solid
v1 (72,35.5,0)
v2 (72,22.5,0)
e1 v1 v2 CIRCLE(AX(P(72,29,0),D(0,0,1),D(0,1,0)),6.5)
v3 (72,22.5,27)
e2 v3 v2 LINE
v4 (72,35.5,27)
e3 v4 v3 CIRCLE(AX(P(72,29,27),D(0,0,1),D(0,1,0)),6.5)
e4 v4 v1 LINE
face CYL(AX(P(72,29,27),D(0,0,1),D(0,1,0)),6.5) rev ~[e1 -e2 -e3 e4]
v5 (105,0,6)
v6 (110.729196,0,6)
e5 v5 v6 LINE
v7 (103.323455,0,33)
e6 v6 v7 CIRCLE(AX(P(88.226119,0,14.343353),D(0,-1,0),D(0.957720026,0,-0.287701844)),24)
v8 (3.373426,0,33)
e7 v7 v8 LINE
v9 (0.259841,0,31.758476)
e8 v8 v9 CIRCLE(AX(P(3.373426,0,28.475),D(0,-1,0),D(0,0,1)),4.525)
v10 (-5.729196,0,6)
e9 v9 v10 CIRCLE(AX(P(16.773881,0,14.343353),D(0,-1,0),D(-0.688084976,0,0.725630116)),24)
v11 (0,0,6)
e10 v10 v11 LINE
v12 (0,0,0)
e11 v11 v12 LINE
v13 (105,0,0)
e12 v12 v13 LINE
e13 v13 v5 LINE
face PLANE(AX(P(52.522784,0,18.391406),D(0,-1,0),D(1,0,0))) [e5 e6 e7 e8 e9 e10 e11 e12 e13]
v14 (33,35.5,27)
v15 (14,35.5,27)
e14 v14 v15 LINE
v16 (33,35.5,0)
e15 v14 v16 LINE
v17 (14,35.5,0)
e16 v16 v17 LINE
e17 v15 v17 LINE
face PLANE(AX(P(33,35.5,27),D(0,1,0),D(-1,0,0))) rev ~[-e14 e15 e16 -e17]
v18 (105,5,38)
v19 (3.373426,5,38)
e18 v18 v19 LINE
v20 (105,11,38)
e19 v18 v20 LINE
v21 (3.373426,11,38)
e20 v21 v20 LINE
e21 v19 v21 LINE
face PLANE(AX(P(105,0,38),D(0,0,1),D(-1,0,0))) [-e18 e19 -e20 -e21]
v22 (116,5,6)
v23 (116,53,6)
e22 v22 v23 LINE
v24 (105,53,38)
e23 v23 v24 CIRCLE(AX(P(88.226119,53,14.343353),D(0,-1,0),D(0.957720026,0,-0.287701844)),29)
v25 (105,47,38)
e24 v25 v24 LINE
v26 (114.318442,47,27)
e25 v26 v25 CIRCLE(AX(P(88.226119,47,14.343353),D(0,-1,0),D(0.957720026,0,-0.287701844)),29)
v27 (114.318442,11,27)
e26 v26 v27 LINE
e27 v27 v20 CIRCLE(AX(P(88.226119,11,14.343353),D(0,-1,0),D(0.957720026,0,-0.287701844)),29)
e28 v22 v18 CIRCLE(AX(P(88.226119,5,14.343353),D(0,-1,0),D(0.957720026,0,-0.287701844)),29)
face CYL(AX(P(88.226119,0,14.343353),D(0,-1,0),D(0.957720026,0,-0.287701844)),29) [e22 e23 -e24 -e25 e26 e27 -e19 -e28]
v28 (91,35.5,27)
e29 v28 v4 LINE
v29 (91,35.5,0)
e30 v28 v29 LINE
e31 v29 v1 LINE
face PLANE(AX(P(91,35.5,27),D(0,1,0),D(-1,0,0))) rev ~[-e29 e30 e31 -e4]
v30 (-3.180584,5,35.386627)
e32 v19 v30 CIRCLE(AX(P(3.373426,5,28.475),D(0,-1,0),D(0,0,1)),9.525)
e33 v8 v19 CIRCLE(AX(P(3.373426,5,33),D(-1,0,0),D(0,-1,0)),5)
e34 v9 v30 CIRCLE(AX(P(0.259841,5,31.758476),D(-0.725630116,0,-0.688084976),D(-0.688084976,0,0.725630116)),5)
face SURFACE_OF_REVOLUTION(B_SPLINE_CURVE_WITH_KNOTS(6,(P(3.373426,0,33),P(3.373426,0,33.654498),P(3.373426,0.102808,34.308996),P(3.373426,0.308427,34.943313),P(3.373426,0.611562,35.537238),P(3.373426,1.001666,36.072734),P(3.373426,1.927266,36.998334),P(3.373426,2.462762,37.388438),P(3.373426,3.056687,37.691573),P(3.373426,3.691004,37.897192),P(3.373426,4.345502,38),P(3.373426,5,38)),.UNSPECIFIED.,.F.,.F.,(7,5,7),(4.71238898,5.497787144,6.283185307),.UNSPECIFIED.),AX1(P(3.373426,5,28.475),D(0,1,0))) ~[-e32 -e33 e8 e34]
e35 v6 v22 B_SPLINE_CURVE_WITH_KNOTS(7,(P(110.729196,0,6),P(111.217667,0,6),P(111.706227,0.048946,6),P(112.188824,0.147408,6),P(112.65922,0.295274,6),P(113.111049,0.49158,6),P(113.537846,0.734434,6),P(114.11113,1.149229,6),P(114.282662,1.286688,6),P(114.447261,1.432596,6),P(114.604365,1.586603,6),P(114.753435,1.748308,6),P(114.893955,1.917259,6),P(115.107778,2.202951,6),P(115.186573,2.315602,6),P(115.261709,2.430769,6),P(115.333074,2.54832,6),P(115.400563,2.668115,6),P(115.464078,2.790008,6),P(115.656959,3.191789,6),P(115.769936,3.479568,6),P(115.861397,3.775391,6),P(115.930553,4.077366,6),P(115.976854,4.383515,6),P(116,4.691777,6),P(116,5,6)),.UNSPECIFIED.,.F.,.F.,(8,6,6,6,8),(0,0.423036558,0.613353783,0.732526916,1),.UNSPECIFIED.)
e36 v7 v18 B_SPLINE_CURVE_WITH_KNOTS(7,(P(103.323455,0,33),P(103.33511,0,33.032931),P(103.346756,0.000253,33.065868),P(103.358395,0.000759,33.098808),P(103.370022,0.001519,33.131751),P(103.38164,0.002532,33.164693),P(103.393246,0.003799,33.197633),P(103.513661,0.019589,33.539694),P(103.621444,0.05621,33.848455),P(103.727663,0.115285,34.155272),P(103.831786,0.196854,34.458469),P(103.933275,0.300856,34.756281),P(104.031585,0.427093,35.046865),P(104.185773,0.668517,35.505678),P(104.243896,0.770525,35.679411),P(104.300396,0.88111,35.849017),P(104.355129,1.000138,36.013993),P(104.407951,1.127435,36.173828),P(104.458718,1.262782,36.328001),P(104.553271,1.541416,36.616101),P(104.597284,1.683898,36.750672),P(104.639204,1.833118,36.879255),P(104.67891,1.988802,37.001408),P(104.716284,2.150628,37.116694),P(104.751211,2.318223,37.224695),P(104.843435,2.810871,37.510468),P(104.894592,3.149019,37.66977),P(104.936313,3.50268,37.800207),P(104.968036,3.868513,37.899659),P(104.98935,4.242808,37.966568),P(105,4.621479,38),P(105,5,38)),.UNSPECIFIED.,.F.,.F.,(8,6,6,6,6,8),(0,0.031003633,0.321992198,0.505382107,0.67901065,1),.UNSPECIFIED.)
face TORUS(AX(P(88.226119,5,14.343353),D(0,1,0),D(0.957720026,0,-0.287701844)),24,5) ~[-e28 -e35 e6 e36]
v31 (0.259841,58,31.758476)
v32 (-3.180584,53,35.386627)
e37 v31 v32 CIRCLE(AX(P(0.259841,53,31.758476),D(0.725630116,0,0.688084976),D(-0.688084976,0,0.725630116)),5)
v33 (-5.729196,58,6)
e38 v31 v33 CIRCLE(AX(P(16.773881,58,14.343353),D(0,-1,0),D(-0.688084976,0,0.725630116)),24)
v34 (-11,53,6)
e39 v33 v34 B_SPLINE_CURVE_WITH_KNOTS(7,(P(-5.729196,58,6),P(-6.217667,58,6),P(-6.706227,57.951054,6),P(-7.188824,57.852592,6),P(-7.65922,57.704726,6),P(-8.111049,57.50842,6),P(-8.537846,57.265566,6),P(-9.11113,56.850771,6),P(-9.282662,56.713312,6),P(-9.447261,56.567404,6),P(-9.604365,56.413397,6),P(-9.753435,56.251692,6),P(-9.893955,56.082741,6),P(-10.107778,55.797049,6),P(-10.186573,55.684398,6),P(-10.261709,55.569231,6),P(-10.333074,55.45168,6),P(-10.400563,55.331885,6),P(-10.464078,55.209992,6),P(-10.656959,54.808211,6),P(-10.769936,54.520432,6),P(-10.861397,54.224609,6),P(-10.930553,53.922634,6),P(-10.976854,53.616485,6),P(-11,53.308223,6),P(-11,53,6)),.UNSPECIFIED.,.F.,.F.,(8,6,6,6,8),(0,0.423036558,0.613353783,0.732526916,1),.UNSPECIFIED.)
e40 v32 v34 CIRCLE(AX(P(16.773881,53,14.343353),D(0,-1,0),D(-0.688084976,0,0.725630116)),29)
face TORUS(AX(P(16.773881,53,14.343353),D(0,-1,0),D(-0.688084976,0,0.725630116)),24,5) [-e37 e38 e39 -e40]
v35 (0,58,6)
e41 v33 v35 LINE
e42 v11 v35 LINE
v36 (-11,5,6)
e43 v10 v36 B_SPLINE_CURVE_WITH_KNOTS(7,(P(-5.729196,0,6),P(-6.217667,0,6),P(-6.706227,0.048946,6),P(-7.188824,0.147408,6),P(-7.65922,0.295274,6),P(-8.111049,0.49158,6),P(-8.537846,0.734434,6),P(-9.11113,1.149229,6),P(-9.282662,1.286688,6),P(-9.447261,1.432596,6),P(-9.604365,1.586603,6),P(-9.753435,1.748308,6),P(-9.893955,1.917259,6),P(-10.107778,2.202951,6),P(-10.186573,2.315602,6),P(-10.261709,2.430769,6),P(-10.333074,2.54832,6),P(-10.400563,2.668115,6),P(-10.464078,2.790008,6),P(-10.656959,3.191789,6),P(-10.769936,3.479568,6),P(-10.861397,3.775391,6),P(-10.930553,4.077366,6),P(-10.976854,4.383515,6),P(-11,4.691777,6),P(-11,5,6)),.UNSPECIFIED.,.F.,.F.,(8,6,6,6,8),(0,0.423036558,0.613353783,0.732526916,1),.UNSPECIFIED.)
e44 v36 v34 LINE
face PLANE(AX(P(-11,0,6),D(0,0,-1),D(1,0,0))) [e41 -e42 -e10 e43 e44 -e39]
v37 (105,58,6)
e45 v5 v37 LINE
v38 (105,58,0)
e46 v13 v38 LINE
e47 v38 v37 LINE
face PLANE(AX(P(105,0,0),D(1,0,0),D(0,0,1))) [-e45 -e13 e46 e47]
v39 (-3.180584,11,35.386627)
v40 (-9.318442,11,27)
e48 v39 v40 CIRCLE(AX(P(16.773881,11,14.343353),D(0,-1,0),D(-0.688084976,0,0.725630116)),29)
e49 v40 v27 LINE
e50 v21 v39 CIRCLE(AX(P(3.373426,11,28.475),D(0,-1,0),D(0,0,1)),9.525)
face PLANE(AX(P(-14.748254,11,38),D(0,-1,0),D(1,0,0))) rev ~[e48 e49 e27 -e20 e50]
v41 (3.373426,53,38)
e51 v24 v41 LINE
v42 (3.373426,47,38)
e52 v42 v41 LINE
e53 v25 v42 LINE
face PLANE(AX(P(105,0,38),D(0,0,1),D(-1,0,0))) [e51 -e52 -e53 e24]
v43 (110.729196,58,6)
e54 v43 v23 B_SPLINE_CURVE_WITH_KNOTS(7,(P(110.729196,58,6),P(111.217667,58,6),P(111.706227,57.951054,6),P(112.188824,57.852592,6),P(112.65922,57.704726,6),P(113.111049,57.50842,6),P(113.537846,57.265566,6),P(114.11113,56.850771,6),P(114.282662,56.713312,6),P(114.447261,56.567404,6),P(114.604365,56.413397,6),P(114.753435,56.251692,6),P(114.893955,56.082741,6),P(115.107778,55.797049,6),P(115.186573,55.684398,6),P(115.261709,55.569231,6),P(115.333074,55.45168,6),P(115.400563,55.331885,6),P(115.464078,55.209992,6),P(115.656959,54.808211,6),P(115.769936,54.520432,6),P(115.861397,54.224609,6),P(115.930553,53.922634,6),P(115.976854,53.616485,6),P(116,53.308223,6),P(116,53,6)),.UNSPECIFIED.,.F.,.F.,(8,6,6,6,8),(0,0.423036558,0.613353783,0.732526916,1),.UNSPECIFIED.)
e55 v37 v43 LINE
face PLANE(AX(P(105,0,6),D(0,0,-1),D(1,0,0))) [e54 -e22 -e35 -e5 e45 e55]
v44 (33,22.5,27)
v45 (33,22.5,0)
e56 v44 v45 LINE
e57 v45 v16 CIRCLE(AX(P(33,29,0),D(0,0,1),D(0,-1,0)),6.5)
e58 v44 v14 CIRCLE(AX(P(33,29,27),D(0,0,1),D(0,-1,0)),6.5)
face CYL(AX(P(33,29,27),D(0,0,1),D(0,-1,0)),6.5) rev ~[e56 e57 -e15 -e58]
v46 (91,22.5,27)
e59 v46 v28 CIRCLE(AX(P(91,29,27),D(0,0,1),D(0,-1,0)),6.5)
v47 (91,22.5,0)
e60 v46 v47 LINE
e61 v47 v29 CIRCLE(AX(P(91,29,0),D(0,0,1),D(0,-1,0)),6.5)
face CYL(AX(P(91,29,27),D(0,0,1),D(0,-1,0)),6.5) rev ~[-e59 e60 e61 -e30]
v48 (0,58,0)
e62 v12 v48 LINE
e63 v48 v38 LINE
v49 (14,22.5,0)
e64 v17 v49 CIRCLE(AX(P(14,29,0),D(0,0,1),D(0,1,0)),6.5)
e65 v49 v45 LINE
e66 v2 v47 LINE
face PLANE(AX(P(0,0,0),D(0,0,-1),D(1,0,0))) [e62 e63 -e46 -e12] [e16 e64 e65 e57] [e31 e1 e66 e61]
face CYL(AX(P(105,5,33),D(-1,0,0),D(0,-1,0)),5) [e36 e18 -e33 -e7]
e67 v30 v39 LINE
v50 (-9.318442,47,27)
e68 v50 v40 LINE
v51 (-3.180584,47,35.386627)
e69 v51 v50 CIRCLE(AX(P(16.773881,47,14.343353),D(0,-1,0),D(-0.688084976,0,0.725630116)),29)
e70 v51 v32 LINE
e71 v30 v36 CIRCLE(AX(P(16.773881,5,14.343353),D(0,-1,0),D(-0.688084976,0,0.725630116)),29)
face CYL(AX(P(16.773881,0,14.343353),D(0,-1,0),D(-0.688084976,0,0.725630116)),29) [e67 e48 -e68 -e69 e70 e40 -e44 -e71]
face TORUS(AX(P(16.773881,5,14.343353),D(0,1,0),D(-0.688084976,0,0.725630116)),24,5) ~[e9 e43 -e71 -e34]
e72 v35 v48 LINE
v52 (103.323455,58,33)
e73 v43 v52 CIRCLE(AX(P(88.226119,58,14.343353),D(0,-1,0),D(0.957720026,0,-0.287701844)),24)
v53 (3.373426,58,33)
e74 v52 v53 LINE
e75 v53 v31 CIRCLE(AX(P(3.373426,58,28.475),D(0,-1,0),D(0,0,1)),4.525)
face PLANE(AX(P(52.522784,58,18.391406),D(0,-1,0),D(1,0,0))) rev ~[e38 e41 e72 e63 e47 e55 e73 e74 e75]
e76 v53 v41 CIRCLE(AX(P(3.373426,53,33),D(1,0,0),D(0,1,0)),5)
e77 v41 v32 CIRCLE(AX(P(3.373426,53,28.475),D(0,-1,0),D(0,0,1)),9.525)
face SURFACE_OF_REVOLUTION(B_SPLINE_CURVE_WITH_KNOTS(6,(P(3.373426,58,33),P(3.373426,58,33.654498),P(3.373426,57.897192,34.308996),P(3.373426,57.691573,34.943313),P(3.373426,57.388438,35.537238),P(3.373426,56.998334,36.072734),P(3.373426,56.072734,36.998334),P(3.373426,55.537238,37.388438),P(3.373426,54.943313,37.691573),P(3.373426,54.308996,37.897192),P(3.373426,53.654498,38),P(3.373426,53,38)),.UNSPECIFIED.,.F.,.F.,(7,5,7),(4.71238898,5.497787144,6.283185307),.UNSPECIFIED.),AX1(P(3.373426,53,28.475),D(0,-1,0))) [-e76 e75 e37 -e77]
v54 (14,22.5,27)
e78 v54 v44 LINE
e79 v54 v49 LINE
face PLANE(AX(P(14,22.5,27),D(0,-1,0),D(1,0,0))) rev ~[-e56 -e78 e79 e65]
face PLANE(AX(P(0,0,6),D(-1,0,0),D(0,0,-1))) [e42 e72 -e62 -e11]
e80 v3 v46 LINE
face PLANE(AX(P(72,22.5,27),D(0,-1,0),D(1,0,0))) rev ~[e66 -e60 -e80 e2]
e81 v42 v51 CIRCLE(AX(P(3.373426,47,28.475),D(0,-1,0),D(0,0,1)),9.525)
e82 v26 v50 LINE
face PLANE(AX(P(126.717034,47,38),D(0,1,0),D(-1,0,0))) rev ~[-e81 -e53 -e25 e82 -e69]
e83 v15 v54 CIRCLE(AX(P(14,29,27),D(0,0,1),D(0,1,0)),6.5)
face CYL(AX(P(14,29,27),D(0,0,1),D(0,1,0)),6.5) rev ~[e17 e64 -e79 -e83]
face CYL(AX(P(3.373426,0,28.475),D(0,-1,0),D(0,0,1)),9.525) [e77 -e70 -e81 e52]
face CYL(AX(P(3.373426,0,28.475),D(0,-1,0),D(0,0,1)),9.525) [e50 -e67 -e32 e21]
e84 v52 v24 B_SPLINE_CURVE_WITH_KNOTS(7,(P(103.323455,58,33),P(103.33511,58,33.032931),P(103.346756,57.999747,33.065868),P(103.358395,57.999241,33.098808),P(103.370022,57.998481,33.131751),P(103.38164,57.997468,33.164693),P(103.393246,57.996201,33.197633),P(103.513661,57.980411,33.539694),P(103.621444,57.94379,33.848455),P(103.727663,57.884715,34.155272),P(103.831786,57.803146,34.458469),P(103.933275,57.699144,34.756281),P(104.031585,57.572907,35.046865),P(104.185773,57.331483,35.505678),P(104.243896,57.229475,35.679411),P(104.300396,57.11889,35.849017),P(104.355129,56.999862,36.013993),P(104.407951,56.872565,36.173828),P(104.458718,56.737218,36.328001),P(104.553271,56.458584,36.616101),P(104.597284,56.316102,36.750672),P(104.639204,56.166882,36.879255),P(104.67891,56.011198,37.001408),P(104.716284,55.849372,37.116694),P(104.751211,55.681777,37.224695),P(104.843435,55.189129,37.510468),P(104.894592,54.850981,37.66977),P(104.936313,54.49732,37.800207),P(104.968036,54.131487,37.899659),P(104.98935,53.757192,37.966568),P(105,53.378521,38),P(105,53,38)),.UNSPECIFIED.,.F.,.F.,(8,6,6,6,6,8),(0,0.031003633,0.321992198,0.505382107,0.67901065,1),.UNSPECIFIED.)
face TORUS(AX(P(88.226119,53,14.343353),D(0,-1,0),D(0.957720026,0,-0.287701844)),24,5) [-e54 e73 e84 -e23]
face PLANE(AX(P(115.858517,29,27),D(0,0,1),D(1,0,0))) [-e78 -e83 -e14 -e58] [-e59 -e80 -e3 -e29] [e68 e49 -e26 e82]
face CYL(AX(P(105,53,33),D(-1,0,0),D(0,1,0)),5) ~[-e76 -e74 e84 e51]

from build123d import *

# Parameters (mm, degrees)
F1_DEPTH = 58
F2_W     = 21.7170343468
F2_H     = 36
F2_W_2   = 18.1216797089
F2_W_3   = 101.6265741507
F3_DEPTH = 11
F5_DEPTH = 27
F6_DEPTH = 27
F7_R     = 5
F8_R     = 5


# Not quite as in the source:
# - a feature names something its author has since deleted; it is built from what else it names


with BuildPart() as f1:
    # F0 (on Front) → F1 (new body)
    with BuildSketch(Plane.XZ):
        with BuildLine():
            Line((0, 6), (0, 0))
            Line((0, 0), (105, 0))
            Line((105, 0), (105, 6))
            Line((105, 6), (116, 6))
            ThreePointArc((116, 6), (115.651030618, 23.7706667749), (105, 38))
            Line((105, 38), (3.3734258493, 38))
            ThreePointArc((3.3734258493, 38), (-0.1544899089, 37.3225666374), (-3.1805835495, 35.3866268563))
            ThreePointArc((-3.1805835495, 35.3866268563), (-11.2509687534, 21.8004179002), (-11, 6))
            Line((-11, 6), (0, 6))
        make_face()
    extrude(amount=-F1_DEPTH)

    # F2 (on face) → F3 (cut)
    with BuildSketch(Plane.XY.offset(38)):
        with Locations((115.8585171734, 29)):
            Rectangle(F2_W, F2_H)
        with Locations((-5.6874140052, 29)):
            Rectangle(F2_W_2, F2_H)
        with Locations((54.1867129246, 29)):
            Rectangle(F2_W_3, F2_H)
    extrude(amount=-F3_DEPTH, mode=Mode.SUBTRACT)

    # F4 (on face) → F5 (cut)
    with BuildSketch(Plane.XY.offset(27)):
        with BuildLine():
            Line((33, 35.5), (14, 35.5))
            ThreePointArc((14, 35.5), (7.5, 29), (14, 22.5))
            Line((14, 22.5), (33, 22.5))
            ThreePointArc((33, 22.5), (39.5, 29), (33, 35.5))
        make_face()
    extrude(amount=-F5_DEPTH, mode=Mode.SUBTRACT)

    # F4 (on face) → F6 (cut)
    with BuildSketch(Plane.XY.offset(27)):
        with BuildLine():
            Line((91, 35.5), (72, 35.5))
            ThreePointArc((72, 35.5), (65.5, 29), (72, 22.5))
            Line((72, 22.5), (91, 22.5))
            ThreePointArc((91, 22.5), (97.5, 29), (91, 35.5))
        make_face()
    extrude(amount=-F6_DEPTH, mode=Mode.SUBTRACT)

    # F7
    f7_edges = [f1.edges().sort_by_distance(p)[0] for p in [
        (54.186713, 0, 38),
        (115.651031, 0, 23.770667),
    ]]
    fillet(f7_edges, radius=F7_R)

    # F8
    f8_edges = [f1.edges().sort_by_distance(p)[0] for p in [
        (115.651031, 58, 23.770667),
        (54.186713, 58, 38),
    ]]
    fillet(f8_edges, radius=F8_R)


solid = f1.part
